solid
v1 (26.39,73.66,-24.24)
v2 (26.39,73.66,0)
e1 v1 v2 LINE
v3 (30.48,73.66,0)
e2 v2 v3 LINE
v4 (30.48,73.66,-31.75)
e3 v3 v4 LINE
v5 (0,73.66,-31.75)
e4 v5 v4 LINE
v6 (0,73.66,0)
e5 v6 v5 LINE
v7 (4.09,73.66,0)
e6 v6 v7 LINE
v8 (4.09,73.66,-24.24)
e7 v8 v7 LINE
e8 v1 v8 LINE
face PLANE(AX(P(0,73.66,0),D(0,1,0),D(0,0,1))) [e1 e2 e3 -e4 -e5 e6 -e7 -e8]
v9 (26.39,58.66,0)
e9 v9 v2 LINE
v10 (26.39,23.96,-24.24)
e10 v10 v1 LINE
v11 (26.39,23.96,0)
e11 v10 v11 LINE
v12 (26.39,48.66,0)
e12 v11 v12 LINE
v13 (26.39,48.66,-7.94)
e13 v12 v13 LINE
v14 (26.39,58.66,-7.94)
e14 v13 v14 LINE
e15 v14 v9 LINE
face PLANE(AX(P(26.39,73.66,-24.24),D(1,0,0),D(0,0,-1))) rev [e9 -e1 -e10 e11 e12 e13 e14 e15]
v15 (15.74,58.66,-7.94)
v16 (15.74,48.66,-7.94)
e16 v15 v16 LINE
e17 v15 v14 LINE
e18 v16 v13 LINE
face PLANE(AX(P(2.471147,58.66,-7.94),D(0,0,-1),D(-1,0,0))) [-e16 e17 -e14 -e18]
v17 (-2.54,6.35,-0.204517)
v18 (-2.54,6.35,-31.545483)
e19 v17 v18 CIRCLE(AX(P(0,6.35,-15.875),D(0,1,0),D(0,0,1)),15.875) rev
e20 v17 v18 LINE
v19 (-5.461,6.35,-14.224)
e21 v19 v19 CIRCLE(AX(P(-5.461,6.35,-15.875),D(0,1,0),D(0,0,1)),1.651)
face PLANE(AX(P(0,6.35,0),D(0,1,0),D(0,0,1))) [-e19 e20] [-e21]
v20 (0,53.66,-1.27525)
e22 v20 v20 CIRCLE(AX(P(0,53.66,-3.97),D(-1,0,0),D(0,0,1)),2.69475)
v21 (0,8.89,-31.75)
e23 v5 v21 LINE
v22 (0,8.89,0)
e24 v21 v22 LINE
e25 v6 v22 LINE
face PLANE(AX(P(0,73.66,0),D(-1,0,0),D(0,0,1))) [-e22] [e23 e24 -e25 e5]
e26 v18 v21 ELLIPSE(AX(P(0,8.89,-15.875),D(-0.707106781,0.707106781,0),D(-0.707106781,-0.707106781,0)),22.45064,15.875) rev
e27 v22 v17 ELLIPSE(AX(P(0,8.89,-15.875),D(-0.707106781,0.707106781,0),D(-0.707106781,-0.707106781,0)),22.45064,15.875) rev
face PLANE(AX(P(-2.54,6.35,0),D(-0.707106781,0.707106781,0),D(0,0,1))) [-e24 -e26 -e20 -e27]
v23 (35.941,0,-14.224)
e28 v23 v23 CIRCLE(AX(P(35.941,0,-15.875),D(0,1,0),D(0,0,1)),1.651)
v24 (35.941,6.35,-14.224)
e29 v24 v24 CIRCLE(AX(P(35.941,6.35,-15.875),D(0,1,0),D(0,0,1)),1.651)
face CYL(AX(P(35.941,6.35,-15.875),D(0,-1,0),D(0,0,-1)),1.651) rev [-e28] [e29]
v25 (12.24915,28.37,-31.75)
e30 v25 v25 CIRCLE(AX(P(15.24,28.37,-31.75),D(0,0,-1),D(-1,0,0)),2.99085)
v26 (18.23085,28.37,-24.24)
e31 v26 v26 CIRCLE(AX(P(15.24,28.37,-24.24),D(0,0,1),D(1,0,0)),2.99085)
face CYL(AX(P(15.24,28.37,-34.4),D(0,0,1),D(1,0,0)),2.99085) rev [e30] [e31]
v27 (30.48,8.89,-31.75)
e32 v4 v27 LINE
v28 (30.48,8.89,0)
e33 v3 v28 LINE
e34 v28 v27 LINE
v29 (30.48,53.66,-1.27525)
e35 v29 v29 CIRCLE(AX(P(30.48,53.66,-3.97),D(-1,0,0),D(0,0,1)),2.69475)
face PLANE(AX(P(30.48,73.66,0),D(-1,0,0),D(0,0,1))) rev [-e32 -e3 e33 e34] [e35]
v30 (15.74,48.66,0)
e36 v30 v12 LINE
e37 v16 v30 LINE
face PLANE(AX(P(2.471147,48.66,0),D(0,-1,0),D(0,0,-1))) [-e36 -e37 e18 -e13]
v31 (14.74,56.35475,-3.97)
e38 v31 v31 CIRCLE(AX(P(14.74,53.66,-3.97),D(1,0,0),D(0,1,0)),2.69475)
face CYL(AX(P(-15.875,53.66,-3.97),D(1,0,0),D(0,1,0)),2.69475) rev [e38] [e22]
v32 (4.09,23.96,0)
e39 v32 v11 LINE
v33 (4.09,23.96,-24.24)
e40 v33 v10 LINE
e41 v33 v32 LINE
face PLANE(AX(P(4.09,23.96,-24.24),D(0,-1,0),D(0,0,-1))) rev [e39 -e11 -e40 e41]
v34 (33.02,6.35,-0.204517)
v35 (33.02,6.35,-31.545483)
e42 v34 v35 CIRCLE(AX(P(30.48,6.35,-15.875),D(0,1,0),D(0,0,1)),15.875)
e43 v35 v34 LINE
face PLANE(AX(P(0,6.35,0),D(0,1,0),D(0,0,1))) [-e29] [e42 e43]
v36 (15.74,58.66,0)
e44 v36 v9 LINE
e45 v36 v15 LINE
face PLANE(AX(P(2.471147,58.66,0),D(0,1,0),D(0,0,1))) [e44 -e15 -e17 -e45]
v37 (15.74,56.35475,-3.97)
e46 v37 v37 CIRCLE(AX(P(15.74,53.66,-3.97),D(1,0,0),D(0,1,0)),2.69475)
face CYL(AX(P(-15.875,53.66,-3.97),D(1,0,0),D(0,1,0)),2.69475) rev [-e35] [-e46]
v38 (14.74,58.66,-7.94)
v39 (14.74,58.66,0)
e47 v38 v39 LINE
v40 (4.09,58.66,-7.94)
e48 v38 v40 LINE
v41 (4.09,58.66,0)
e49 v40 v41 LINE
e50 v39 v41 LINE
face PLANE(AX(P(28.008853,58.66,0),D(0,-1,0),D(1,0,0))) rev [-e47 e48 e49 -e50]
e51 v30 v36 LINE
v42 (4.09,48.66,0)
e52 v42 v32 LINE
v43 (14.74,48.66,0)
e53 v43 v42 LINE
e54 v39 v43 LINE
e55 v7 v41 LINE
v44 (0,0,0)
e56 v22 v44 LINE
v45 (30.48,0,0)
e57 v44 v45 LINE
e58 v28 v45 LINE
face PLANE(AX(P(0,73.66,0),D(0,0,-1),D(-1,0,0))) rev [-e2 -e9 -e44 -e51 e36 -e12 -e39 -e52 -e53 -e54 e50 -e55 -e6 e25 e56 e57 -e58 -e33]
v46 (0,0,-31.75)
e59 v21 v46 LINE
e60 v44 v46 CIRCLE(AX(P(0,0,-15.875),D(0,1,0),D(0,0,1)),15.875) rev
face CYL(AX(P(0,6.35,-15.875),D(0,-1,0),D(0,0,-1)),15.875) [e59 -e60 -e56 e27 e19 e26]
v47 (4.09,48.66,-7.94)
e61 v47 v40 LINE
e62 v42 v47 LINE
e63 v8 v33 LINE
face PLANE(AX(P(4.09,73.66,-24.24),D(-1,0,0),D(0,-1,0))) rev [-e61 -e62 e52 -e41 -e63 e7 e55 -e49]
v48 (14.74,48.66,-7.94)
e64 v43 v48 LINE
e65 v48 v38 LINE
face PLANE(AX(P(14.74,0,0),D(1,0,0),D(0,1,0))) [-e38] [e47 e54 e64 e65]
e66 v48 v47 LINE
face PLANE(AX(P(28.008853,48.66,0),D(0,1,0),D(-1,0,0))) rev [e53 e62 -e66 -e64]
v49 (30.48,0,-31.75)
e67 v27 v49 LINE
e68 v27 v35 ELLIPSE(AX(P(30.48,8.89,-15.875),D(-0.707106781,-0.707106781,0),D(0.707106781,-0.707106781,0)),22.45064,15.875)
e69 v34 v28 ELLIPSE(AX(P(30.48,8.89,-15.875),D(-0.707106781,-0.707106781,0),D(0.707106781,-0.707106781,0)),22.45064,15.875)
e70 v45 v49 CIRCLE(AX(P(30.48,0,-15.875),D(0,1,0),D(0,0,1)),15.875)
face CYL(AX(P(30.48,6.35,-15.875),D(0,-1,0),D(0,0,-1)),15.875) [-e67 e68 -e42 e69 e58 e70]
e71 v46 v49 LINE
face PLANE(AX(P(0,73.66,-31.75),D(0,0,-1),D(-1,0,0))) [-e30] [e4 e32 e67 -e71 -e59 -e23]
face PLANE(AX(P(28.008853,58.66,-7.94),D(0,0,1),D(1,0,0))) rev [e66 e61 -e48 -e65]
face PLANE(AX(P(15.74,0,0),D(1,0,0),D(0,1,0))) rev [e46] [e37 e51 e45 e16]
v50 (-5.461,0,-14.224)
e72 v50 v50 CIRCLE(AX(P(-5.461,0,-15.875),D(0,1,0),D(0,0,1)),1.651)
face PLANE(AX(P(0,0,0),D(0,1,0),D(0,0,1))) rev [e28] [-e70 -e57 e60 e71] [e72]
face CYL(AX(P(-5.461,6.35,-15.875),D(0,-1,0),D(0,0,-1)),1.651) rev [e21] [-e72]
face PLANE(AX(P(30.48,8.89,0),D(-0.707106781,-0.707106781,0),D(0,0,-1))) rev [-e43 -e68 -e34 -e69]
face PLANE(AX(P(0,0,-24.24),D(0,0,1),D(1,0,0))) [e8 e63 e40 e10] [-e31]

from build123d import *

# Parameters (mm, degrees)
SKETCH1_R               = 1.651
BOSS_EXTRUDE1_DEPTH     = 6.35
BOSS_EXTRUDE1_2_DEPTH   = 6.35
SKETCH1_3_W             = 30.48
SKETCH1_3_H             = 31.75
BOSS_EXTRUDE2_DEPTH     = 73.66
SKETCH2_W               = 22.3
SKETCH2_H               = 49.699999914
CUT_EXTRUDE1_DEPTH      = 24.240000034
SKETCH3_R               = 2.99085
CUT_EXTRUDE2_DEPTH      = 10.16
CHAMFER1_SIZE           = 2.54
SKETCH4_W               = 7.940000122
SKETCH4_H               = 10
BOSS_EXTRUDE3_DEPTH     = 10.65
CUT_EXTRUDE3_DEPTH      = 87.216972372
CUT_EXTRUDE3_DEPTH_BACK = 87.716972372
CUT_EXTRUDE3_START      = 0.5
SKETCH6_R               = 2.694750008


with BuildPart() as part:
    # Sketch1 → Boss-Extrude1 (new body)
    with BuildSketch(Plane(origin=(0, 0, 0), x_dir=(1, 0, 0), z_dir=(0, 1, 0))):
        with BuildLine():
            ThreePointArc((0, 0), (-15.875, 15.875), (0, 31.75))
            Line((0, 31.75), (0, 0))
        make_face()
        with Locations(Location((-5.461, 15.875, 0), (0, 0, 270))):
            Circle(SKETCH1_R, mode=Mode.SUBTRACT)
    extrude(amount=BOSS_EXTRUDE1_DEPTH)



with BuildPart() as body_2:
    # Sketch1 → Boss-Extrude1 2 (new body)
    with BuildSketch(Plane(origin=(0, 0, 0), x_dir=(1, 0, 0), z_dir=(0, 1, 0))):
        with BuildLine():
            Line((30.48, 0), (30.48, 31.75))
            ThreePointArc((30.48, 31.75), (46.355, 15.875), (30.48, 0))
        make_face()
        with Locations(Location((35.941, 15.875, 0), (0, 0, 270))):
            Circle(SKETCH1_R, mode=Mode.SUBTRACT)
    extrude(amount=BOSS_EXTRUDE1_2_DEPTH)


with BuildPart() as part_1:
    add(part.part)

    add(body_2.part)  # Boss-Extrude2 merges body 2
    # Sketch1<3> → Boss-Extrude2 (add)
    with BuildSketch(Plane(origin=(0, 0, 0), x_dir=(1, 0, 0), z_dir=(0, 1, 0))):
        with Locations((15.24, 15.875)):
            Rectangle(SKETCH1_3_W, SKETCH1_3_H)
    extrude(amount=BOSS_EXTRUDE2_DEPTH)

    # Sketch2 → Cut-Extrude1 (cut)
    with BuildSketch(Plane.XY):
        with Locations((15.24, 48.810000043)):
            Rectangle(SKETCH2_W, SKETCH2_H)
    extrude(amount=-CUT_EXTRUDE1_DEPTH, mode=Mode.SUBTRACT)

    # Sketch3 → Cut-Extrude2 (cut)
    with BuildSketch(Plane.XY.offset(-24.240000034)):
        with Locations((15.24, 28.370000086)):
            Circle(SKETCH3_R)
    extrude(amount=-CUT_EXTRUDE2_DEPTH, mode=Mode.SUBTRACT)

    # Chamfer1
    # the kernel refuses this chamfer: 2.54 mm, written as the material it adds along each edge
    with BuildSketch(Plane(origin=(0, 6.35, -38.282074789), x_dir=(-0.9996219169112966, -0.02749587661058626, 0), z_dir=(0, 0, 1))) as chamfer1_piece_1_section:
        Polygon((CHAMFER1_SIZE * 0.999621916911, -CHAMFER1_SIZE * 0.0274958766106), (-CHAMFER1_SIZE * 0.0274958766106, -CHAMFER1_SIZE * 0.999621916911), (0, 0), align=None)
    chamfer1_piece_1 = extrude(amount=44.814149579, mode=Mode.PRIVATE)
    chamfer1_piece_1 = chamfer1_piece_1 & Plane(origin=(0, 7.197393373, -15.875), x_dir=(0, 0, 1), z_dir=(0, -1, 0)) * Cylinder(15.875, 100, mode=Mode.PRIVATE)
    add(chamfer1_piece_1)
    with BuildSketch(Plane(origin=(30.48, 6.35, 6.532074789), x_dir=(-0.02749587661058591, 0.9996219169112968, 0), z_dir=(0, 0, -1))) as chamfer1_piece_2_section:
        Polygon((CHAMFER1_SIZE * 0.999621916911, CHAMFER1_SIZE * 0.0274958766106), (-CHAMFER1_SIZE * 0.0274958766106, CHAMFER1_SIZE * 0.999621916911), (0, 0), align=None)
    chamfer1_piece_2 = extrude(amount=44.814149579, mode=Mode.PRIVATE)
    chamfer1_piece_2 = chamfer1_piece_2 & Plane(origin=(30.48, 7.197393373, -15.875), x_dir=(0, 0, -1), z_dir=(0, -1, 0)) * Cylinder(15.875, 100, mode=Mode.PRIVATE)
    add(chamfer1_piece_2)

    # Sketch4 → Boss-Extrude3 (add)
    with BuildSketch(Plane(origin=(4.09, 0, 0), x_dir=(0, 0, -1), z_dir=(1, 0, 0))):
        with Locations((3.970000061, 53.66)):
            Rectangle(SKETCH4_W, SKETCH4_H)
    boss_extrude3 = extrude(amount=BOSS_EXTRUDE3_DEPTH)

    # Mirror1: Boss-Extrude3 across plane
    add(boss_extrude3.mirror(Plane(origin=(15.24, 0, 0), x_dir=(0, 0, 1), z_dir=(1, 0, 0))))

    # Sketch6 → Cut-Extrude3 (cut, two sides: drawn at the far end of the back side and taken through both)
    with BuildSketch(Plane(origin=(14.74, 0, 0), x_dir=(0, 0, -1), z_dir=(1, 0, 0)).offset(CUT_EXTRUDE3_START - CUT_EXTRUDE3_DEPTH_BACK)):
        with Locations(Location((3.970000061, 53.66, 0), (0, 0, 90))):
            Circle(SKETCH6_R)
    extrude(amount=CUT_EXTRUDE3_DEPTH + CUT_EXTRUDE3_DEPTH_BACK, mode=Mode.SUBTRACT)


solid = part_1.part
